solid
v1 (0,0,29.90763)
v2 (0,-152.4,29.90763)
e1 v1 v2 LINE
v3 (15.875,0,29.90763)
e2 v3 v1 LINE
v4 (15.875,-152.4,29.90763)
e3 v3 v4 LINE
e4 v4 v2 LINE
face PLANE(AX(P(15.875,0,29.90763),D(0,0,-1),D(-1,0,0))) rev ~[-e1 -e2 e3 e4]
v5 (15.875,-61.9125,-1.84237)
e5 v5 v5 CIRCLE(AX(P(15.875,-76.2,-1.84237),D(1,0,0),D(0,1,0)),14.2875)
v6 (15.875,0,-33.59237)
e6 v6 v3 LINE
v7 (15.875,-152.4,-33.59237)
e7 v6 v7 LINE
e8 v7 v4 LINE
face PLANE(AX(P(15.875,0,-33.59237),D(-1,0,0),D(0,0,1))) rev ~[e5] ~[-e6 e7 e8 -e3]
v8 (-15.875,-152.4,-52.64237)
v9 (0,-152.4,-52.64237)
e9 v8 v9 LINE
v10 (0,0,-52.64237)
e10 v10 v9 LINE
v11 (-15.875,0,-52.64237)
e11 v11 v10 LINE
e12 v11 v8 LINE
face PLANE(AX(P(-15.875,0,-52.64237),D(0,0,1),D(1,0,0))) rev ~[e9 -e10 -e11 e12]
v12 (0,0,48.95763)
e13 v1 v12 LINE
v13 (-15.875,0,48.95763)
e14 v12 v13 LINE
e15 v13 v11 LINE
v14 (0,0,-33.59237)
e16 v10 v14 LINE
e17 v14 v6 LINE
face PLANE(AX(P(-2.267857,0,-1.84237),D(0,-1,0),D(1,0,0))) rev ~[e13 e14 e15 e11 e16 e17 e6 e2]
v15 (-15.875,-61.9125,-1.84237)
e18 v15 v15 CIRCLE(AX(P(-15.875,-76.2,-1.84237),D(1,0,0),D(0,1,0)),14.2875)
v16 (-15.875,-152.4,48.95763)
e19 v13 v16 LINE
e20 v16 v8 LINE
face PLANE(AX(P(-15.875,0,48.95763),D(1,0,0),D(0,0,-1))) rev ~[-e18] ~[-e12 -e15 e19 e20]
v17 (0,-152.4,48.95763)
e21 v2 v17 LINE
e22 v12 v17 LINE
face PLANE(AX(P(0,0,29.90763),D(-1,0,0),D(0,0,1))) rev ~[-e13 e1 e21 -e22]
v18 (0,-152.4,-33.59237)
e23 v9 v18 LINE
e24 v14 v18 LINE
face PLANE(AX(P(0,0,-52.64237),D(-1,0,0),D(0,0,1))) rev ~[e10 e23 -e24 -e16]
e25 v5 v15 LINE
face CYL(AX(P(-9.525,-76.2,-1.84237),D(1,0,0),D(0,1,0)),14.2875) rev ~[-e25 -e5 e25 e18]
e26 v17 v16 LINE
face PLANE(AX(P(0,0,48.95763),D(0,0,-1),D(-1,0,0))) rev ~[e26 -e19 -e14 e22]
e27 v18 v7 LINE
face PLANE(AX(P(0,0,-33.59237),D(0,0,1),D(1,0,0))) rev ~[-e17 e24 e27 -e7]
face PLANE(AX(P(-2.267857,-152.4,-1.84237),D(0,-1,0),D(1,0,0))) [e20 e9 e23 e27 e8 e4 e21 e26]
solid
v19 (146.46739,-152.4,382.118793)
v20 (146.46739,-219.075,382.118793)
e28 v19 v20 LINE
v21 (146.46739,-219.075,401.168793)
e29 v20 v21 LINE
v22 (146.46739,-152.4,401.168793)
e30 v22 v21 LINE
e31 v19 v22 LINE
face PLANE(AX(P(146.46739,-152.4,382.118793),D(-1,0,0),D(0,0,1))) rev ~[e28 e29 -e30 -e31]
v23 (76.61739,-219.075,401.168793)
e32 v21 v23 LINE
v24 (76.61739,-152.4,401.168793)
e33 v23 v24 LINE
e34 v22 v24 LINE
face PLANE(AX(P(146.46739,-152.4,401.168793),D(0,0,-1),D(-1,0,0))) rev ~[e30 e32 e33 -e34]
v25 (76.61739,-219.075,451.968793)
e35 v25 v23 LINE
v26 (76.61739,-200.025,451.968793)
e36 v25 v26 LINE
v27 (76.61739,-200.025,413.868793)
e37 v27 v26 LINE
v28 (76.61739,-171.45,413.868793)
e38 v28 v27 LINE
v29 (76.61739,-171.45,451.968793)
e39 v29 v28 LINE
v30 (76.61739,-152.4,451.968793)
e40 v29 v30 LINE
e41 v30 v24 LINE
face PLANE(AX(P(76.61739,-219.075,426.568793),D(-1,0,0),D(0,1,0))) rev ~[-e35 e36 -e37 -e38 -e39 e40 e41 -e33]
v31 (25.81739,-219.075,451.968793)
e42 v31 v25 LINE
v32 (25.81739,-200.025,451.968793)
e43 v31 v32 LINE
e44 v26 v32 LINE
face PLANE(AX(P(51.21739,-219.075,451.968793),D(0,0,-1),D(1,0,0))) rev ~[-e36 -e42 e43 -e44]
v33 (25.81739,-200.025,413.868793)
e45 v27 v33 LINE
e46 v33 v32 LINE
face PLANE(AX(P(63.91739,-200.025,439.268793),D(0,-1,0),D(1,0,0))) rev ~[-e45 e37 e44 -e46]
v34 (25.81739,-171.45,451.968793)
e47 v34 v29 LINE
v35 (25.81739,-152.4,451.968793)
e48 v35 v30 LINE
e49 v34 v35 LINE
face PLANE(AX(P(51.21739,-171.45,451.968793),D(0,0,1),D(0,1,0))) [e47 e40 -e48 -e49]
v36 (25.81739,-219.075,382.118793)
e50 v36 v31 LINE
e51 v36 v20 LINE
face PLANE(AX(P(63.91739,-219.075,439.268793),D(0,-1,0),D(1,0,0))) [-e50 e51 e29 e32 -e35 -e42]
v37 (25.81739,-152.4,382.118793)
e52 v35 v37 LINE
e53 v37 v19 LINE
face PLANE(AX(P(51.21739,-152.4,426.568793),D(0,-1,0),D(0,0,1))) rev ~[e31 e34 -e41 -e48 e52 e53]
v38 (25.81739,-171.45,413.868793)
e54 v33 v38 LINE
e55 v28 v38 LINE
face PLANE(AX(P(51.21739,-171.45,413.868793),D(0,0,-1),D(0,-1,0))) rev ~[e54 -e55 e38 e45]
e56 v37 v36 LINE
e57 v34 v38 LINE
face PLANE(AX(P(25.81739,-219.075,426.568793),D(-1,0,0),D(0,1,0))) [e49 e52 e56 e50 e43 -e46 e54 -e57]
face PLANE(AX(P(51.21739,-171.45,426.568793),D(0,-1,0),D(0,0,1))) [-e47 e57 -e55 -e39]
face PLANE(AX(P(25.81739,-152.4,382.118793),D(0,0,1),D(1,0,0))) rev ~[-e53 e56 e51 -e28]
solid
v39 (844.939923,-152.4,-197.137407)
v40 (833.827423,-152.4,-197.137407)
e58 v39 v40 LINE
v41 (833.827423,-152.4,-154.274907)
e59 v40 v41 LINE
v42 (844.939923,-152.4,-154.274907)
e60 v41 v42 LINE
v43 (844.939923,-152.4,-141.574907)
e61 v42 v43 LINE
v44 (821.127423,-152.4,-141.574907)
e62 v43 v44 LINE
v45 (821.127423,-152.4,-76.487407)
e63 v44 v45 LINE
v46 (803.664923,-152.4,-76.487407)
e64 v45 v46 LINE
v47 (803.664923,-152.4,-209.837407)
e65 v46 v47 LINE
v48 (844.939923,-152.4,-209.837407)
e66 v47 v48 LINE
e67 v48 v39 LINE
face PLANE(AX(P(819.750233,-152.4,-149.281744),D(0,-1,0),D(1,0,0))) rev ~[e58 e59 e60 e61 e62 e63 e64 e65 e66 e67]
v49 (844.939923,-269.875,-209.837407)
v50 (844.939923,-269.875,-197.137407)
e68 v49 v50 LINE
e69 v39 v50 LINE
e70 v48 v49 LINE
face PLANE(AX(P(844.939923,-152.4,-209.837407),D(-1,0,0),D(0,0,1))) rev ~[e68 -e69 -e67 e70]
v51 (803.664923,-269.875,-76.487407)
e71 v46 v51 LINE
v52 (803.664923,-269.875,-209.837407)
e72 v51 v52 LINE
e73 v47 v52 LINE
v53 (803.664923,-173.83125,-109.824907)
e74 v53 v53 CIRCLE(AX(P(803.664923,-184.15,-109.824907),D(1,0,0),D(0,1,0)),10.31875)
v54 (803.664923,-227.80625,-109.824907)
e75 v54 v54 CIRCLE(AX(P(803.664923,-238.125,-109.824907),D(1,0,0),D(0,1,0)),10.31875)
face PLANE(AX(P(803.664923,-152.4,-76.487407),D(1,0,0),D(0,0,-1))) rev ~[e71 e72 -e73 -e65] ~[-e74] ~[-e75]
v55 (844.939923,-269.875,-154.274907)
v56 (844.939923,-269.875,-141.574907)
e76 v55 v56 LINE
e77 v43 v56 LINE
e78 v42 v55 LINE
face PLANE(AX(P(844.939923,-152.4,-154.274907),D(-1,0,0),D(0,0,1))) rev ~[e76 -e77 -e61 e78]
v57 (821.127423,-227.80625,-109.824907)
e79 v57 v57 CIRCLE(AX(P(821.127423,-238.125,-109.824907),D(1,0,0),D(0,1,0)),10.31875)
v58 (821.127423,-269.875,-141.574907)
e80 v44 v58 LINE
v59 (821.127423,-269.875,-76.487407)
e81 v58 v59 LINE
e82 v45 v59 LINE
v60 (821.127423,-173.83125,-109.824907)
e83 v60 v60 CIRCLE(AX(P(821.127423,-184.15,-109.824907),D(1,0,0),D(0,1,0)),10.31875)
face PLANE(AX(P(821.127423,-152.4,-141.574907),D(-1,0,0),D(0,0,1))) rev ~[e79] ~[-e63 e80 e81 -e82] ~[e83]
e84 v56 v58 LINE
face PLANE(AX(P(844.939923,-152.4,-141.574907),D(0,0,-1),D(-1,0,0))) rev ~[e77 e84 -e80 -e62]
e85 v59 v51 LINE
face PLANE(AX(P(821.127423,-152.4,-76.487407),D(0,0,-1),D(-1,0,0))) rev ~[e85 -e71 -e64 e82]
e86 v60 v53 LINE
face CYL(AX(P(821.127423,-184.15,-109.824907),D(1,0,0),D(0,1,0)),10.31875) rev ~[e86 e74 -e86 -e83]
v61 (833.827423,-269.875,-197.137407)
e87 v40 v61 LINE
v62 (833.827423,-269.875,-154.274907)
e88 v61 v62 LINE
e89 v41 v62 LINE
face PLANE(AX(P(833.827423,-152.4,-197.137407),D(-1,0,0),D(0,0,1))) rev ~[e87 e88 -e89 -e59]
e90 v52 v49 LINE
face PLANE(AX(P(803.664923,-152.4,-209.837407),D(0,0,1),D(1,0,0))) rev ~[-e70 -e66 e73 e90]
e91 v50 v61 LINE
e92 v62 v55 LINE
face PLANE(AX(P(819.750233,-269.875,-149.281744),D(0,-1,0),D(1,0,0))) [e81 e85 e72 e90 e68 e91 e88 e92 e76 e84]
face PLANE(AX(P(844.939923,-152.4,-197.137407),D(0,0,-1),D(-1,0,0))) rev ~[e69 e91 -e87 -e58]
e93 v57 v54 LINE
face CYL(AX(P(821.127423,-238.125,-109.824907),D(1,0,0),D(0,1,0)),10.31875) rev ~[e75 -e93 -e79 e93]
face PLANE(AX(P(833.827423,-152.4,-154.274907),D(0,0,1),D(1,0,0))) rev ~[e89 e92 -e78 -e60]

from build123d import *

# Parameters (mm, degrees)
F1_DEPTH  = 152.4
F2_R      = 14.2875
F3_DEPTH  = 25.4
F4_DEPTH  = 6.351
F6_DEPTH  = 117.475
F8_R      = 10.31875
F9_DEPTH  = 837.0034227142
F13_DEPTH = 66.675
F15_W     = 25.4
F15_H     = 19.05
F16_DEPTH = 25.4
F17_DEPTH = 25.4
F18_DEPTH = 67.0933896
F19_W     = 25.4
F19_H     = 25.4
F20_DEPTH = 19.05
F21_DEPTH = 25.4


# Not quite as in the source:
# - the program builds the solid bodies; features that only make, move or delete a surface that nothing else refers to are left out


with BuildPart() as f1:
    # F0 (on Front) → F1 (new body)
    with BuildSketch(Plane.XZ):
        Polygon((0, 48.9576303571), (-15.875, 48.9576303571), (-15.875, -52.6423696429), (0, -52.6423696429), (0, -33.5923696429), (15.875, -33.5923696429), (15.875, 29.9076303571), (0, 29.9076303571), align=None)
    extrude(amount=F1_DEPTH)

    # F2 (on face) → F3 (cut)
    with BuildSketch(Plane.YZ.offset(15.875)):
        with Locations((-76.2, -1.8423696429)):
            Circle(F2_R)
    extrude(amount=-F3_DEPTH, mode=Mode.SUBTRACT)

    # F4 (cut, through all): a face of the model
    f4_faces = [f1.faces().sort_by_distance(p)[0] for p in [
        (-9.525, -76.2, -1.8423696429),
    ]]
    extrude(f4_faces, amount=-F4_DEPTH, mode=Mode.SUBTRACT)


with BuildPart() as f6:
    # F5 (on face) → F6 (new body)
    with BuildSketch(Plane.XZ.offset(152.4)):
        Polygon((821.1274227142, -76.4874068737), (803.6649227142, -76.4874068737), (803.6649227142, -209.8374068737), (827.4774227142, -209.8374068737), (844.9399227142, -209.8374068737), (844.9399227142, -197.1374068737), (833.8274227142, -197.1374068737), (833.8274227142, -154.2749068737), (844.9399227142, -154.2749068737), (844.9399227142, -141.5749068737), (821.1274227142, -141.5749068737), align=None)
    extrude(amount=F6_DEPTH)

    # F8 (on face) → F9 (cut, through all)
    with BuildSketch(Plane.YZ.offset(821.1274227142)):
        with Locations((-184.15, -109.8249068737)):
            Circle(F8_R)
        with Locations((-238.125, -109.8249068737)):
            Circle(F8_R)
    extrude(amount=-F9_DEPTH, mode=Mode.SUBTRACT)


with BuildPart() as f13:
    # F12 (on face) → F13 (new body)
    with BuildSketch(Plane.XZ.offset(152.4)):
        Polygon((51.2173896, 426.5687932044), (25.8173896, 426.5687932044), (25.8173896, 382.1187932044), (146.4673896, 382.1187932044), (146.4673896, 401.1687932044), (51.2173896, 401.1687932044), align=None)
    extrude(amount=F13_DEPTH)

    # F15 (on face) → F16 (join)
    with BuildSketch(Plane.XY.offset(426.5687932044)):
        with Locations((38.5173896, -209.55)):
            Rectangle(F15_W, F15_H)
        with Locations((38.5173896, -161.925)):
            Rectangle(F15_W, F15_H)
    extrude(amount=F16_DEPTH)

    # F14 (on face) → F17 (join)
    with BuildSketch(Plane.YZ.offset(51.2173896)):
        Polygon((-200.025, 413.8687932044), (-200.025, 426.5687932044), (-219.075, 426.5687932044), (-219.075, 401.1687932044), (-152.4, 401.1687932044), (-152.4, 426.5687932044), (-171.45, 426.5687932044), (-171.45, 413.8687932044), align=None)
    extrude(amount=F17_DEPTH)

    # F18 (cut, through all): a face of the model
    f18_faces = [f13.faces().sort_by_distance(p)[0] for p in [
        (51.2173896, -185.7375, 420.2187932044),
    ]]
    extrude(f18_faces, amount=-F18_DEPTH, mode=Mode.SUBTRACT)

    # F19 (on face) → F20 (join)
    with BuildSketch(Plane.XZ.offset(219.075)):
        with Locations((63.9173896, 439.2687932044)):
            Rectangle(F19_W, F19_H)
    extrude(amount=-F20_DEPTH)

    # F21 (add): a face of the model
    f21_faces = [f13.faces().sort_by_distance(p)[0] for p in [
        (51.2173896, -161.925, 439.2687932044),
    ]]
    extrude(f21_faces, amount=F21_DEPTH)


solid = Compound([f1.part, f6.part, f13.part])
